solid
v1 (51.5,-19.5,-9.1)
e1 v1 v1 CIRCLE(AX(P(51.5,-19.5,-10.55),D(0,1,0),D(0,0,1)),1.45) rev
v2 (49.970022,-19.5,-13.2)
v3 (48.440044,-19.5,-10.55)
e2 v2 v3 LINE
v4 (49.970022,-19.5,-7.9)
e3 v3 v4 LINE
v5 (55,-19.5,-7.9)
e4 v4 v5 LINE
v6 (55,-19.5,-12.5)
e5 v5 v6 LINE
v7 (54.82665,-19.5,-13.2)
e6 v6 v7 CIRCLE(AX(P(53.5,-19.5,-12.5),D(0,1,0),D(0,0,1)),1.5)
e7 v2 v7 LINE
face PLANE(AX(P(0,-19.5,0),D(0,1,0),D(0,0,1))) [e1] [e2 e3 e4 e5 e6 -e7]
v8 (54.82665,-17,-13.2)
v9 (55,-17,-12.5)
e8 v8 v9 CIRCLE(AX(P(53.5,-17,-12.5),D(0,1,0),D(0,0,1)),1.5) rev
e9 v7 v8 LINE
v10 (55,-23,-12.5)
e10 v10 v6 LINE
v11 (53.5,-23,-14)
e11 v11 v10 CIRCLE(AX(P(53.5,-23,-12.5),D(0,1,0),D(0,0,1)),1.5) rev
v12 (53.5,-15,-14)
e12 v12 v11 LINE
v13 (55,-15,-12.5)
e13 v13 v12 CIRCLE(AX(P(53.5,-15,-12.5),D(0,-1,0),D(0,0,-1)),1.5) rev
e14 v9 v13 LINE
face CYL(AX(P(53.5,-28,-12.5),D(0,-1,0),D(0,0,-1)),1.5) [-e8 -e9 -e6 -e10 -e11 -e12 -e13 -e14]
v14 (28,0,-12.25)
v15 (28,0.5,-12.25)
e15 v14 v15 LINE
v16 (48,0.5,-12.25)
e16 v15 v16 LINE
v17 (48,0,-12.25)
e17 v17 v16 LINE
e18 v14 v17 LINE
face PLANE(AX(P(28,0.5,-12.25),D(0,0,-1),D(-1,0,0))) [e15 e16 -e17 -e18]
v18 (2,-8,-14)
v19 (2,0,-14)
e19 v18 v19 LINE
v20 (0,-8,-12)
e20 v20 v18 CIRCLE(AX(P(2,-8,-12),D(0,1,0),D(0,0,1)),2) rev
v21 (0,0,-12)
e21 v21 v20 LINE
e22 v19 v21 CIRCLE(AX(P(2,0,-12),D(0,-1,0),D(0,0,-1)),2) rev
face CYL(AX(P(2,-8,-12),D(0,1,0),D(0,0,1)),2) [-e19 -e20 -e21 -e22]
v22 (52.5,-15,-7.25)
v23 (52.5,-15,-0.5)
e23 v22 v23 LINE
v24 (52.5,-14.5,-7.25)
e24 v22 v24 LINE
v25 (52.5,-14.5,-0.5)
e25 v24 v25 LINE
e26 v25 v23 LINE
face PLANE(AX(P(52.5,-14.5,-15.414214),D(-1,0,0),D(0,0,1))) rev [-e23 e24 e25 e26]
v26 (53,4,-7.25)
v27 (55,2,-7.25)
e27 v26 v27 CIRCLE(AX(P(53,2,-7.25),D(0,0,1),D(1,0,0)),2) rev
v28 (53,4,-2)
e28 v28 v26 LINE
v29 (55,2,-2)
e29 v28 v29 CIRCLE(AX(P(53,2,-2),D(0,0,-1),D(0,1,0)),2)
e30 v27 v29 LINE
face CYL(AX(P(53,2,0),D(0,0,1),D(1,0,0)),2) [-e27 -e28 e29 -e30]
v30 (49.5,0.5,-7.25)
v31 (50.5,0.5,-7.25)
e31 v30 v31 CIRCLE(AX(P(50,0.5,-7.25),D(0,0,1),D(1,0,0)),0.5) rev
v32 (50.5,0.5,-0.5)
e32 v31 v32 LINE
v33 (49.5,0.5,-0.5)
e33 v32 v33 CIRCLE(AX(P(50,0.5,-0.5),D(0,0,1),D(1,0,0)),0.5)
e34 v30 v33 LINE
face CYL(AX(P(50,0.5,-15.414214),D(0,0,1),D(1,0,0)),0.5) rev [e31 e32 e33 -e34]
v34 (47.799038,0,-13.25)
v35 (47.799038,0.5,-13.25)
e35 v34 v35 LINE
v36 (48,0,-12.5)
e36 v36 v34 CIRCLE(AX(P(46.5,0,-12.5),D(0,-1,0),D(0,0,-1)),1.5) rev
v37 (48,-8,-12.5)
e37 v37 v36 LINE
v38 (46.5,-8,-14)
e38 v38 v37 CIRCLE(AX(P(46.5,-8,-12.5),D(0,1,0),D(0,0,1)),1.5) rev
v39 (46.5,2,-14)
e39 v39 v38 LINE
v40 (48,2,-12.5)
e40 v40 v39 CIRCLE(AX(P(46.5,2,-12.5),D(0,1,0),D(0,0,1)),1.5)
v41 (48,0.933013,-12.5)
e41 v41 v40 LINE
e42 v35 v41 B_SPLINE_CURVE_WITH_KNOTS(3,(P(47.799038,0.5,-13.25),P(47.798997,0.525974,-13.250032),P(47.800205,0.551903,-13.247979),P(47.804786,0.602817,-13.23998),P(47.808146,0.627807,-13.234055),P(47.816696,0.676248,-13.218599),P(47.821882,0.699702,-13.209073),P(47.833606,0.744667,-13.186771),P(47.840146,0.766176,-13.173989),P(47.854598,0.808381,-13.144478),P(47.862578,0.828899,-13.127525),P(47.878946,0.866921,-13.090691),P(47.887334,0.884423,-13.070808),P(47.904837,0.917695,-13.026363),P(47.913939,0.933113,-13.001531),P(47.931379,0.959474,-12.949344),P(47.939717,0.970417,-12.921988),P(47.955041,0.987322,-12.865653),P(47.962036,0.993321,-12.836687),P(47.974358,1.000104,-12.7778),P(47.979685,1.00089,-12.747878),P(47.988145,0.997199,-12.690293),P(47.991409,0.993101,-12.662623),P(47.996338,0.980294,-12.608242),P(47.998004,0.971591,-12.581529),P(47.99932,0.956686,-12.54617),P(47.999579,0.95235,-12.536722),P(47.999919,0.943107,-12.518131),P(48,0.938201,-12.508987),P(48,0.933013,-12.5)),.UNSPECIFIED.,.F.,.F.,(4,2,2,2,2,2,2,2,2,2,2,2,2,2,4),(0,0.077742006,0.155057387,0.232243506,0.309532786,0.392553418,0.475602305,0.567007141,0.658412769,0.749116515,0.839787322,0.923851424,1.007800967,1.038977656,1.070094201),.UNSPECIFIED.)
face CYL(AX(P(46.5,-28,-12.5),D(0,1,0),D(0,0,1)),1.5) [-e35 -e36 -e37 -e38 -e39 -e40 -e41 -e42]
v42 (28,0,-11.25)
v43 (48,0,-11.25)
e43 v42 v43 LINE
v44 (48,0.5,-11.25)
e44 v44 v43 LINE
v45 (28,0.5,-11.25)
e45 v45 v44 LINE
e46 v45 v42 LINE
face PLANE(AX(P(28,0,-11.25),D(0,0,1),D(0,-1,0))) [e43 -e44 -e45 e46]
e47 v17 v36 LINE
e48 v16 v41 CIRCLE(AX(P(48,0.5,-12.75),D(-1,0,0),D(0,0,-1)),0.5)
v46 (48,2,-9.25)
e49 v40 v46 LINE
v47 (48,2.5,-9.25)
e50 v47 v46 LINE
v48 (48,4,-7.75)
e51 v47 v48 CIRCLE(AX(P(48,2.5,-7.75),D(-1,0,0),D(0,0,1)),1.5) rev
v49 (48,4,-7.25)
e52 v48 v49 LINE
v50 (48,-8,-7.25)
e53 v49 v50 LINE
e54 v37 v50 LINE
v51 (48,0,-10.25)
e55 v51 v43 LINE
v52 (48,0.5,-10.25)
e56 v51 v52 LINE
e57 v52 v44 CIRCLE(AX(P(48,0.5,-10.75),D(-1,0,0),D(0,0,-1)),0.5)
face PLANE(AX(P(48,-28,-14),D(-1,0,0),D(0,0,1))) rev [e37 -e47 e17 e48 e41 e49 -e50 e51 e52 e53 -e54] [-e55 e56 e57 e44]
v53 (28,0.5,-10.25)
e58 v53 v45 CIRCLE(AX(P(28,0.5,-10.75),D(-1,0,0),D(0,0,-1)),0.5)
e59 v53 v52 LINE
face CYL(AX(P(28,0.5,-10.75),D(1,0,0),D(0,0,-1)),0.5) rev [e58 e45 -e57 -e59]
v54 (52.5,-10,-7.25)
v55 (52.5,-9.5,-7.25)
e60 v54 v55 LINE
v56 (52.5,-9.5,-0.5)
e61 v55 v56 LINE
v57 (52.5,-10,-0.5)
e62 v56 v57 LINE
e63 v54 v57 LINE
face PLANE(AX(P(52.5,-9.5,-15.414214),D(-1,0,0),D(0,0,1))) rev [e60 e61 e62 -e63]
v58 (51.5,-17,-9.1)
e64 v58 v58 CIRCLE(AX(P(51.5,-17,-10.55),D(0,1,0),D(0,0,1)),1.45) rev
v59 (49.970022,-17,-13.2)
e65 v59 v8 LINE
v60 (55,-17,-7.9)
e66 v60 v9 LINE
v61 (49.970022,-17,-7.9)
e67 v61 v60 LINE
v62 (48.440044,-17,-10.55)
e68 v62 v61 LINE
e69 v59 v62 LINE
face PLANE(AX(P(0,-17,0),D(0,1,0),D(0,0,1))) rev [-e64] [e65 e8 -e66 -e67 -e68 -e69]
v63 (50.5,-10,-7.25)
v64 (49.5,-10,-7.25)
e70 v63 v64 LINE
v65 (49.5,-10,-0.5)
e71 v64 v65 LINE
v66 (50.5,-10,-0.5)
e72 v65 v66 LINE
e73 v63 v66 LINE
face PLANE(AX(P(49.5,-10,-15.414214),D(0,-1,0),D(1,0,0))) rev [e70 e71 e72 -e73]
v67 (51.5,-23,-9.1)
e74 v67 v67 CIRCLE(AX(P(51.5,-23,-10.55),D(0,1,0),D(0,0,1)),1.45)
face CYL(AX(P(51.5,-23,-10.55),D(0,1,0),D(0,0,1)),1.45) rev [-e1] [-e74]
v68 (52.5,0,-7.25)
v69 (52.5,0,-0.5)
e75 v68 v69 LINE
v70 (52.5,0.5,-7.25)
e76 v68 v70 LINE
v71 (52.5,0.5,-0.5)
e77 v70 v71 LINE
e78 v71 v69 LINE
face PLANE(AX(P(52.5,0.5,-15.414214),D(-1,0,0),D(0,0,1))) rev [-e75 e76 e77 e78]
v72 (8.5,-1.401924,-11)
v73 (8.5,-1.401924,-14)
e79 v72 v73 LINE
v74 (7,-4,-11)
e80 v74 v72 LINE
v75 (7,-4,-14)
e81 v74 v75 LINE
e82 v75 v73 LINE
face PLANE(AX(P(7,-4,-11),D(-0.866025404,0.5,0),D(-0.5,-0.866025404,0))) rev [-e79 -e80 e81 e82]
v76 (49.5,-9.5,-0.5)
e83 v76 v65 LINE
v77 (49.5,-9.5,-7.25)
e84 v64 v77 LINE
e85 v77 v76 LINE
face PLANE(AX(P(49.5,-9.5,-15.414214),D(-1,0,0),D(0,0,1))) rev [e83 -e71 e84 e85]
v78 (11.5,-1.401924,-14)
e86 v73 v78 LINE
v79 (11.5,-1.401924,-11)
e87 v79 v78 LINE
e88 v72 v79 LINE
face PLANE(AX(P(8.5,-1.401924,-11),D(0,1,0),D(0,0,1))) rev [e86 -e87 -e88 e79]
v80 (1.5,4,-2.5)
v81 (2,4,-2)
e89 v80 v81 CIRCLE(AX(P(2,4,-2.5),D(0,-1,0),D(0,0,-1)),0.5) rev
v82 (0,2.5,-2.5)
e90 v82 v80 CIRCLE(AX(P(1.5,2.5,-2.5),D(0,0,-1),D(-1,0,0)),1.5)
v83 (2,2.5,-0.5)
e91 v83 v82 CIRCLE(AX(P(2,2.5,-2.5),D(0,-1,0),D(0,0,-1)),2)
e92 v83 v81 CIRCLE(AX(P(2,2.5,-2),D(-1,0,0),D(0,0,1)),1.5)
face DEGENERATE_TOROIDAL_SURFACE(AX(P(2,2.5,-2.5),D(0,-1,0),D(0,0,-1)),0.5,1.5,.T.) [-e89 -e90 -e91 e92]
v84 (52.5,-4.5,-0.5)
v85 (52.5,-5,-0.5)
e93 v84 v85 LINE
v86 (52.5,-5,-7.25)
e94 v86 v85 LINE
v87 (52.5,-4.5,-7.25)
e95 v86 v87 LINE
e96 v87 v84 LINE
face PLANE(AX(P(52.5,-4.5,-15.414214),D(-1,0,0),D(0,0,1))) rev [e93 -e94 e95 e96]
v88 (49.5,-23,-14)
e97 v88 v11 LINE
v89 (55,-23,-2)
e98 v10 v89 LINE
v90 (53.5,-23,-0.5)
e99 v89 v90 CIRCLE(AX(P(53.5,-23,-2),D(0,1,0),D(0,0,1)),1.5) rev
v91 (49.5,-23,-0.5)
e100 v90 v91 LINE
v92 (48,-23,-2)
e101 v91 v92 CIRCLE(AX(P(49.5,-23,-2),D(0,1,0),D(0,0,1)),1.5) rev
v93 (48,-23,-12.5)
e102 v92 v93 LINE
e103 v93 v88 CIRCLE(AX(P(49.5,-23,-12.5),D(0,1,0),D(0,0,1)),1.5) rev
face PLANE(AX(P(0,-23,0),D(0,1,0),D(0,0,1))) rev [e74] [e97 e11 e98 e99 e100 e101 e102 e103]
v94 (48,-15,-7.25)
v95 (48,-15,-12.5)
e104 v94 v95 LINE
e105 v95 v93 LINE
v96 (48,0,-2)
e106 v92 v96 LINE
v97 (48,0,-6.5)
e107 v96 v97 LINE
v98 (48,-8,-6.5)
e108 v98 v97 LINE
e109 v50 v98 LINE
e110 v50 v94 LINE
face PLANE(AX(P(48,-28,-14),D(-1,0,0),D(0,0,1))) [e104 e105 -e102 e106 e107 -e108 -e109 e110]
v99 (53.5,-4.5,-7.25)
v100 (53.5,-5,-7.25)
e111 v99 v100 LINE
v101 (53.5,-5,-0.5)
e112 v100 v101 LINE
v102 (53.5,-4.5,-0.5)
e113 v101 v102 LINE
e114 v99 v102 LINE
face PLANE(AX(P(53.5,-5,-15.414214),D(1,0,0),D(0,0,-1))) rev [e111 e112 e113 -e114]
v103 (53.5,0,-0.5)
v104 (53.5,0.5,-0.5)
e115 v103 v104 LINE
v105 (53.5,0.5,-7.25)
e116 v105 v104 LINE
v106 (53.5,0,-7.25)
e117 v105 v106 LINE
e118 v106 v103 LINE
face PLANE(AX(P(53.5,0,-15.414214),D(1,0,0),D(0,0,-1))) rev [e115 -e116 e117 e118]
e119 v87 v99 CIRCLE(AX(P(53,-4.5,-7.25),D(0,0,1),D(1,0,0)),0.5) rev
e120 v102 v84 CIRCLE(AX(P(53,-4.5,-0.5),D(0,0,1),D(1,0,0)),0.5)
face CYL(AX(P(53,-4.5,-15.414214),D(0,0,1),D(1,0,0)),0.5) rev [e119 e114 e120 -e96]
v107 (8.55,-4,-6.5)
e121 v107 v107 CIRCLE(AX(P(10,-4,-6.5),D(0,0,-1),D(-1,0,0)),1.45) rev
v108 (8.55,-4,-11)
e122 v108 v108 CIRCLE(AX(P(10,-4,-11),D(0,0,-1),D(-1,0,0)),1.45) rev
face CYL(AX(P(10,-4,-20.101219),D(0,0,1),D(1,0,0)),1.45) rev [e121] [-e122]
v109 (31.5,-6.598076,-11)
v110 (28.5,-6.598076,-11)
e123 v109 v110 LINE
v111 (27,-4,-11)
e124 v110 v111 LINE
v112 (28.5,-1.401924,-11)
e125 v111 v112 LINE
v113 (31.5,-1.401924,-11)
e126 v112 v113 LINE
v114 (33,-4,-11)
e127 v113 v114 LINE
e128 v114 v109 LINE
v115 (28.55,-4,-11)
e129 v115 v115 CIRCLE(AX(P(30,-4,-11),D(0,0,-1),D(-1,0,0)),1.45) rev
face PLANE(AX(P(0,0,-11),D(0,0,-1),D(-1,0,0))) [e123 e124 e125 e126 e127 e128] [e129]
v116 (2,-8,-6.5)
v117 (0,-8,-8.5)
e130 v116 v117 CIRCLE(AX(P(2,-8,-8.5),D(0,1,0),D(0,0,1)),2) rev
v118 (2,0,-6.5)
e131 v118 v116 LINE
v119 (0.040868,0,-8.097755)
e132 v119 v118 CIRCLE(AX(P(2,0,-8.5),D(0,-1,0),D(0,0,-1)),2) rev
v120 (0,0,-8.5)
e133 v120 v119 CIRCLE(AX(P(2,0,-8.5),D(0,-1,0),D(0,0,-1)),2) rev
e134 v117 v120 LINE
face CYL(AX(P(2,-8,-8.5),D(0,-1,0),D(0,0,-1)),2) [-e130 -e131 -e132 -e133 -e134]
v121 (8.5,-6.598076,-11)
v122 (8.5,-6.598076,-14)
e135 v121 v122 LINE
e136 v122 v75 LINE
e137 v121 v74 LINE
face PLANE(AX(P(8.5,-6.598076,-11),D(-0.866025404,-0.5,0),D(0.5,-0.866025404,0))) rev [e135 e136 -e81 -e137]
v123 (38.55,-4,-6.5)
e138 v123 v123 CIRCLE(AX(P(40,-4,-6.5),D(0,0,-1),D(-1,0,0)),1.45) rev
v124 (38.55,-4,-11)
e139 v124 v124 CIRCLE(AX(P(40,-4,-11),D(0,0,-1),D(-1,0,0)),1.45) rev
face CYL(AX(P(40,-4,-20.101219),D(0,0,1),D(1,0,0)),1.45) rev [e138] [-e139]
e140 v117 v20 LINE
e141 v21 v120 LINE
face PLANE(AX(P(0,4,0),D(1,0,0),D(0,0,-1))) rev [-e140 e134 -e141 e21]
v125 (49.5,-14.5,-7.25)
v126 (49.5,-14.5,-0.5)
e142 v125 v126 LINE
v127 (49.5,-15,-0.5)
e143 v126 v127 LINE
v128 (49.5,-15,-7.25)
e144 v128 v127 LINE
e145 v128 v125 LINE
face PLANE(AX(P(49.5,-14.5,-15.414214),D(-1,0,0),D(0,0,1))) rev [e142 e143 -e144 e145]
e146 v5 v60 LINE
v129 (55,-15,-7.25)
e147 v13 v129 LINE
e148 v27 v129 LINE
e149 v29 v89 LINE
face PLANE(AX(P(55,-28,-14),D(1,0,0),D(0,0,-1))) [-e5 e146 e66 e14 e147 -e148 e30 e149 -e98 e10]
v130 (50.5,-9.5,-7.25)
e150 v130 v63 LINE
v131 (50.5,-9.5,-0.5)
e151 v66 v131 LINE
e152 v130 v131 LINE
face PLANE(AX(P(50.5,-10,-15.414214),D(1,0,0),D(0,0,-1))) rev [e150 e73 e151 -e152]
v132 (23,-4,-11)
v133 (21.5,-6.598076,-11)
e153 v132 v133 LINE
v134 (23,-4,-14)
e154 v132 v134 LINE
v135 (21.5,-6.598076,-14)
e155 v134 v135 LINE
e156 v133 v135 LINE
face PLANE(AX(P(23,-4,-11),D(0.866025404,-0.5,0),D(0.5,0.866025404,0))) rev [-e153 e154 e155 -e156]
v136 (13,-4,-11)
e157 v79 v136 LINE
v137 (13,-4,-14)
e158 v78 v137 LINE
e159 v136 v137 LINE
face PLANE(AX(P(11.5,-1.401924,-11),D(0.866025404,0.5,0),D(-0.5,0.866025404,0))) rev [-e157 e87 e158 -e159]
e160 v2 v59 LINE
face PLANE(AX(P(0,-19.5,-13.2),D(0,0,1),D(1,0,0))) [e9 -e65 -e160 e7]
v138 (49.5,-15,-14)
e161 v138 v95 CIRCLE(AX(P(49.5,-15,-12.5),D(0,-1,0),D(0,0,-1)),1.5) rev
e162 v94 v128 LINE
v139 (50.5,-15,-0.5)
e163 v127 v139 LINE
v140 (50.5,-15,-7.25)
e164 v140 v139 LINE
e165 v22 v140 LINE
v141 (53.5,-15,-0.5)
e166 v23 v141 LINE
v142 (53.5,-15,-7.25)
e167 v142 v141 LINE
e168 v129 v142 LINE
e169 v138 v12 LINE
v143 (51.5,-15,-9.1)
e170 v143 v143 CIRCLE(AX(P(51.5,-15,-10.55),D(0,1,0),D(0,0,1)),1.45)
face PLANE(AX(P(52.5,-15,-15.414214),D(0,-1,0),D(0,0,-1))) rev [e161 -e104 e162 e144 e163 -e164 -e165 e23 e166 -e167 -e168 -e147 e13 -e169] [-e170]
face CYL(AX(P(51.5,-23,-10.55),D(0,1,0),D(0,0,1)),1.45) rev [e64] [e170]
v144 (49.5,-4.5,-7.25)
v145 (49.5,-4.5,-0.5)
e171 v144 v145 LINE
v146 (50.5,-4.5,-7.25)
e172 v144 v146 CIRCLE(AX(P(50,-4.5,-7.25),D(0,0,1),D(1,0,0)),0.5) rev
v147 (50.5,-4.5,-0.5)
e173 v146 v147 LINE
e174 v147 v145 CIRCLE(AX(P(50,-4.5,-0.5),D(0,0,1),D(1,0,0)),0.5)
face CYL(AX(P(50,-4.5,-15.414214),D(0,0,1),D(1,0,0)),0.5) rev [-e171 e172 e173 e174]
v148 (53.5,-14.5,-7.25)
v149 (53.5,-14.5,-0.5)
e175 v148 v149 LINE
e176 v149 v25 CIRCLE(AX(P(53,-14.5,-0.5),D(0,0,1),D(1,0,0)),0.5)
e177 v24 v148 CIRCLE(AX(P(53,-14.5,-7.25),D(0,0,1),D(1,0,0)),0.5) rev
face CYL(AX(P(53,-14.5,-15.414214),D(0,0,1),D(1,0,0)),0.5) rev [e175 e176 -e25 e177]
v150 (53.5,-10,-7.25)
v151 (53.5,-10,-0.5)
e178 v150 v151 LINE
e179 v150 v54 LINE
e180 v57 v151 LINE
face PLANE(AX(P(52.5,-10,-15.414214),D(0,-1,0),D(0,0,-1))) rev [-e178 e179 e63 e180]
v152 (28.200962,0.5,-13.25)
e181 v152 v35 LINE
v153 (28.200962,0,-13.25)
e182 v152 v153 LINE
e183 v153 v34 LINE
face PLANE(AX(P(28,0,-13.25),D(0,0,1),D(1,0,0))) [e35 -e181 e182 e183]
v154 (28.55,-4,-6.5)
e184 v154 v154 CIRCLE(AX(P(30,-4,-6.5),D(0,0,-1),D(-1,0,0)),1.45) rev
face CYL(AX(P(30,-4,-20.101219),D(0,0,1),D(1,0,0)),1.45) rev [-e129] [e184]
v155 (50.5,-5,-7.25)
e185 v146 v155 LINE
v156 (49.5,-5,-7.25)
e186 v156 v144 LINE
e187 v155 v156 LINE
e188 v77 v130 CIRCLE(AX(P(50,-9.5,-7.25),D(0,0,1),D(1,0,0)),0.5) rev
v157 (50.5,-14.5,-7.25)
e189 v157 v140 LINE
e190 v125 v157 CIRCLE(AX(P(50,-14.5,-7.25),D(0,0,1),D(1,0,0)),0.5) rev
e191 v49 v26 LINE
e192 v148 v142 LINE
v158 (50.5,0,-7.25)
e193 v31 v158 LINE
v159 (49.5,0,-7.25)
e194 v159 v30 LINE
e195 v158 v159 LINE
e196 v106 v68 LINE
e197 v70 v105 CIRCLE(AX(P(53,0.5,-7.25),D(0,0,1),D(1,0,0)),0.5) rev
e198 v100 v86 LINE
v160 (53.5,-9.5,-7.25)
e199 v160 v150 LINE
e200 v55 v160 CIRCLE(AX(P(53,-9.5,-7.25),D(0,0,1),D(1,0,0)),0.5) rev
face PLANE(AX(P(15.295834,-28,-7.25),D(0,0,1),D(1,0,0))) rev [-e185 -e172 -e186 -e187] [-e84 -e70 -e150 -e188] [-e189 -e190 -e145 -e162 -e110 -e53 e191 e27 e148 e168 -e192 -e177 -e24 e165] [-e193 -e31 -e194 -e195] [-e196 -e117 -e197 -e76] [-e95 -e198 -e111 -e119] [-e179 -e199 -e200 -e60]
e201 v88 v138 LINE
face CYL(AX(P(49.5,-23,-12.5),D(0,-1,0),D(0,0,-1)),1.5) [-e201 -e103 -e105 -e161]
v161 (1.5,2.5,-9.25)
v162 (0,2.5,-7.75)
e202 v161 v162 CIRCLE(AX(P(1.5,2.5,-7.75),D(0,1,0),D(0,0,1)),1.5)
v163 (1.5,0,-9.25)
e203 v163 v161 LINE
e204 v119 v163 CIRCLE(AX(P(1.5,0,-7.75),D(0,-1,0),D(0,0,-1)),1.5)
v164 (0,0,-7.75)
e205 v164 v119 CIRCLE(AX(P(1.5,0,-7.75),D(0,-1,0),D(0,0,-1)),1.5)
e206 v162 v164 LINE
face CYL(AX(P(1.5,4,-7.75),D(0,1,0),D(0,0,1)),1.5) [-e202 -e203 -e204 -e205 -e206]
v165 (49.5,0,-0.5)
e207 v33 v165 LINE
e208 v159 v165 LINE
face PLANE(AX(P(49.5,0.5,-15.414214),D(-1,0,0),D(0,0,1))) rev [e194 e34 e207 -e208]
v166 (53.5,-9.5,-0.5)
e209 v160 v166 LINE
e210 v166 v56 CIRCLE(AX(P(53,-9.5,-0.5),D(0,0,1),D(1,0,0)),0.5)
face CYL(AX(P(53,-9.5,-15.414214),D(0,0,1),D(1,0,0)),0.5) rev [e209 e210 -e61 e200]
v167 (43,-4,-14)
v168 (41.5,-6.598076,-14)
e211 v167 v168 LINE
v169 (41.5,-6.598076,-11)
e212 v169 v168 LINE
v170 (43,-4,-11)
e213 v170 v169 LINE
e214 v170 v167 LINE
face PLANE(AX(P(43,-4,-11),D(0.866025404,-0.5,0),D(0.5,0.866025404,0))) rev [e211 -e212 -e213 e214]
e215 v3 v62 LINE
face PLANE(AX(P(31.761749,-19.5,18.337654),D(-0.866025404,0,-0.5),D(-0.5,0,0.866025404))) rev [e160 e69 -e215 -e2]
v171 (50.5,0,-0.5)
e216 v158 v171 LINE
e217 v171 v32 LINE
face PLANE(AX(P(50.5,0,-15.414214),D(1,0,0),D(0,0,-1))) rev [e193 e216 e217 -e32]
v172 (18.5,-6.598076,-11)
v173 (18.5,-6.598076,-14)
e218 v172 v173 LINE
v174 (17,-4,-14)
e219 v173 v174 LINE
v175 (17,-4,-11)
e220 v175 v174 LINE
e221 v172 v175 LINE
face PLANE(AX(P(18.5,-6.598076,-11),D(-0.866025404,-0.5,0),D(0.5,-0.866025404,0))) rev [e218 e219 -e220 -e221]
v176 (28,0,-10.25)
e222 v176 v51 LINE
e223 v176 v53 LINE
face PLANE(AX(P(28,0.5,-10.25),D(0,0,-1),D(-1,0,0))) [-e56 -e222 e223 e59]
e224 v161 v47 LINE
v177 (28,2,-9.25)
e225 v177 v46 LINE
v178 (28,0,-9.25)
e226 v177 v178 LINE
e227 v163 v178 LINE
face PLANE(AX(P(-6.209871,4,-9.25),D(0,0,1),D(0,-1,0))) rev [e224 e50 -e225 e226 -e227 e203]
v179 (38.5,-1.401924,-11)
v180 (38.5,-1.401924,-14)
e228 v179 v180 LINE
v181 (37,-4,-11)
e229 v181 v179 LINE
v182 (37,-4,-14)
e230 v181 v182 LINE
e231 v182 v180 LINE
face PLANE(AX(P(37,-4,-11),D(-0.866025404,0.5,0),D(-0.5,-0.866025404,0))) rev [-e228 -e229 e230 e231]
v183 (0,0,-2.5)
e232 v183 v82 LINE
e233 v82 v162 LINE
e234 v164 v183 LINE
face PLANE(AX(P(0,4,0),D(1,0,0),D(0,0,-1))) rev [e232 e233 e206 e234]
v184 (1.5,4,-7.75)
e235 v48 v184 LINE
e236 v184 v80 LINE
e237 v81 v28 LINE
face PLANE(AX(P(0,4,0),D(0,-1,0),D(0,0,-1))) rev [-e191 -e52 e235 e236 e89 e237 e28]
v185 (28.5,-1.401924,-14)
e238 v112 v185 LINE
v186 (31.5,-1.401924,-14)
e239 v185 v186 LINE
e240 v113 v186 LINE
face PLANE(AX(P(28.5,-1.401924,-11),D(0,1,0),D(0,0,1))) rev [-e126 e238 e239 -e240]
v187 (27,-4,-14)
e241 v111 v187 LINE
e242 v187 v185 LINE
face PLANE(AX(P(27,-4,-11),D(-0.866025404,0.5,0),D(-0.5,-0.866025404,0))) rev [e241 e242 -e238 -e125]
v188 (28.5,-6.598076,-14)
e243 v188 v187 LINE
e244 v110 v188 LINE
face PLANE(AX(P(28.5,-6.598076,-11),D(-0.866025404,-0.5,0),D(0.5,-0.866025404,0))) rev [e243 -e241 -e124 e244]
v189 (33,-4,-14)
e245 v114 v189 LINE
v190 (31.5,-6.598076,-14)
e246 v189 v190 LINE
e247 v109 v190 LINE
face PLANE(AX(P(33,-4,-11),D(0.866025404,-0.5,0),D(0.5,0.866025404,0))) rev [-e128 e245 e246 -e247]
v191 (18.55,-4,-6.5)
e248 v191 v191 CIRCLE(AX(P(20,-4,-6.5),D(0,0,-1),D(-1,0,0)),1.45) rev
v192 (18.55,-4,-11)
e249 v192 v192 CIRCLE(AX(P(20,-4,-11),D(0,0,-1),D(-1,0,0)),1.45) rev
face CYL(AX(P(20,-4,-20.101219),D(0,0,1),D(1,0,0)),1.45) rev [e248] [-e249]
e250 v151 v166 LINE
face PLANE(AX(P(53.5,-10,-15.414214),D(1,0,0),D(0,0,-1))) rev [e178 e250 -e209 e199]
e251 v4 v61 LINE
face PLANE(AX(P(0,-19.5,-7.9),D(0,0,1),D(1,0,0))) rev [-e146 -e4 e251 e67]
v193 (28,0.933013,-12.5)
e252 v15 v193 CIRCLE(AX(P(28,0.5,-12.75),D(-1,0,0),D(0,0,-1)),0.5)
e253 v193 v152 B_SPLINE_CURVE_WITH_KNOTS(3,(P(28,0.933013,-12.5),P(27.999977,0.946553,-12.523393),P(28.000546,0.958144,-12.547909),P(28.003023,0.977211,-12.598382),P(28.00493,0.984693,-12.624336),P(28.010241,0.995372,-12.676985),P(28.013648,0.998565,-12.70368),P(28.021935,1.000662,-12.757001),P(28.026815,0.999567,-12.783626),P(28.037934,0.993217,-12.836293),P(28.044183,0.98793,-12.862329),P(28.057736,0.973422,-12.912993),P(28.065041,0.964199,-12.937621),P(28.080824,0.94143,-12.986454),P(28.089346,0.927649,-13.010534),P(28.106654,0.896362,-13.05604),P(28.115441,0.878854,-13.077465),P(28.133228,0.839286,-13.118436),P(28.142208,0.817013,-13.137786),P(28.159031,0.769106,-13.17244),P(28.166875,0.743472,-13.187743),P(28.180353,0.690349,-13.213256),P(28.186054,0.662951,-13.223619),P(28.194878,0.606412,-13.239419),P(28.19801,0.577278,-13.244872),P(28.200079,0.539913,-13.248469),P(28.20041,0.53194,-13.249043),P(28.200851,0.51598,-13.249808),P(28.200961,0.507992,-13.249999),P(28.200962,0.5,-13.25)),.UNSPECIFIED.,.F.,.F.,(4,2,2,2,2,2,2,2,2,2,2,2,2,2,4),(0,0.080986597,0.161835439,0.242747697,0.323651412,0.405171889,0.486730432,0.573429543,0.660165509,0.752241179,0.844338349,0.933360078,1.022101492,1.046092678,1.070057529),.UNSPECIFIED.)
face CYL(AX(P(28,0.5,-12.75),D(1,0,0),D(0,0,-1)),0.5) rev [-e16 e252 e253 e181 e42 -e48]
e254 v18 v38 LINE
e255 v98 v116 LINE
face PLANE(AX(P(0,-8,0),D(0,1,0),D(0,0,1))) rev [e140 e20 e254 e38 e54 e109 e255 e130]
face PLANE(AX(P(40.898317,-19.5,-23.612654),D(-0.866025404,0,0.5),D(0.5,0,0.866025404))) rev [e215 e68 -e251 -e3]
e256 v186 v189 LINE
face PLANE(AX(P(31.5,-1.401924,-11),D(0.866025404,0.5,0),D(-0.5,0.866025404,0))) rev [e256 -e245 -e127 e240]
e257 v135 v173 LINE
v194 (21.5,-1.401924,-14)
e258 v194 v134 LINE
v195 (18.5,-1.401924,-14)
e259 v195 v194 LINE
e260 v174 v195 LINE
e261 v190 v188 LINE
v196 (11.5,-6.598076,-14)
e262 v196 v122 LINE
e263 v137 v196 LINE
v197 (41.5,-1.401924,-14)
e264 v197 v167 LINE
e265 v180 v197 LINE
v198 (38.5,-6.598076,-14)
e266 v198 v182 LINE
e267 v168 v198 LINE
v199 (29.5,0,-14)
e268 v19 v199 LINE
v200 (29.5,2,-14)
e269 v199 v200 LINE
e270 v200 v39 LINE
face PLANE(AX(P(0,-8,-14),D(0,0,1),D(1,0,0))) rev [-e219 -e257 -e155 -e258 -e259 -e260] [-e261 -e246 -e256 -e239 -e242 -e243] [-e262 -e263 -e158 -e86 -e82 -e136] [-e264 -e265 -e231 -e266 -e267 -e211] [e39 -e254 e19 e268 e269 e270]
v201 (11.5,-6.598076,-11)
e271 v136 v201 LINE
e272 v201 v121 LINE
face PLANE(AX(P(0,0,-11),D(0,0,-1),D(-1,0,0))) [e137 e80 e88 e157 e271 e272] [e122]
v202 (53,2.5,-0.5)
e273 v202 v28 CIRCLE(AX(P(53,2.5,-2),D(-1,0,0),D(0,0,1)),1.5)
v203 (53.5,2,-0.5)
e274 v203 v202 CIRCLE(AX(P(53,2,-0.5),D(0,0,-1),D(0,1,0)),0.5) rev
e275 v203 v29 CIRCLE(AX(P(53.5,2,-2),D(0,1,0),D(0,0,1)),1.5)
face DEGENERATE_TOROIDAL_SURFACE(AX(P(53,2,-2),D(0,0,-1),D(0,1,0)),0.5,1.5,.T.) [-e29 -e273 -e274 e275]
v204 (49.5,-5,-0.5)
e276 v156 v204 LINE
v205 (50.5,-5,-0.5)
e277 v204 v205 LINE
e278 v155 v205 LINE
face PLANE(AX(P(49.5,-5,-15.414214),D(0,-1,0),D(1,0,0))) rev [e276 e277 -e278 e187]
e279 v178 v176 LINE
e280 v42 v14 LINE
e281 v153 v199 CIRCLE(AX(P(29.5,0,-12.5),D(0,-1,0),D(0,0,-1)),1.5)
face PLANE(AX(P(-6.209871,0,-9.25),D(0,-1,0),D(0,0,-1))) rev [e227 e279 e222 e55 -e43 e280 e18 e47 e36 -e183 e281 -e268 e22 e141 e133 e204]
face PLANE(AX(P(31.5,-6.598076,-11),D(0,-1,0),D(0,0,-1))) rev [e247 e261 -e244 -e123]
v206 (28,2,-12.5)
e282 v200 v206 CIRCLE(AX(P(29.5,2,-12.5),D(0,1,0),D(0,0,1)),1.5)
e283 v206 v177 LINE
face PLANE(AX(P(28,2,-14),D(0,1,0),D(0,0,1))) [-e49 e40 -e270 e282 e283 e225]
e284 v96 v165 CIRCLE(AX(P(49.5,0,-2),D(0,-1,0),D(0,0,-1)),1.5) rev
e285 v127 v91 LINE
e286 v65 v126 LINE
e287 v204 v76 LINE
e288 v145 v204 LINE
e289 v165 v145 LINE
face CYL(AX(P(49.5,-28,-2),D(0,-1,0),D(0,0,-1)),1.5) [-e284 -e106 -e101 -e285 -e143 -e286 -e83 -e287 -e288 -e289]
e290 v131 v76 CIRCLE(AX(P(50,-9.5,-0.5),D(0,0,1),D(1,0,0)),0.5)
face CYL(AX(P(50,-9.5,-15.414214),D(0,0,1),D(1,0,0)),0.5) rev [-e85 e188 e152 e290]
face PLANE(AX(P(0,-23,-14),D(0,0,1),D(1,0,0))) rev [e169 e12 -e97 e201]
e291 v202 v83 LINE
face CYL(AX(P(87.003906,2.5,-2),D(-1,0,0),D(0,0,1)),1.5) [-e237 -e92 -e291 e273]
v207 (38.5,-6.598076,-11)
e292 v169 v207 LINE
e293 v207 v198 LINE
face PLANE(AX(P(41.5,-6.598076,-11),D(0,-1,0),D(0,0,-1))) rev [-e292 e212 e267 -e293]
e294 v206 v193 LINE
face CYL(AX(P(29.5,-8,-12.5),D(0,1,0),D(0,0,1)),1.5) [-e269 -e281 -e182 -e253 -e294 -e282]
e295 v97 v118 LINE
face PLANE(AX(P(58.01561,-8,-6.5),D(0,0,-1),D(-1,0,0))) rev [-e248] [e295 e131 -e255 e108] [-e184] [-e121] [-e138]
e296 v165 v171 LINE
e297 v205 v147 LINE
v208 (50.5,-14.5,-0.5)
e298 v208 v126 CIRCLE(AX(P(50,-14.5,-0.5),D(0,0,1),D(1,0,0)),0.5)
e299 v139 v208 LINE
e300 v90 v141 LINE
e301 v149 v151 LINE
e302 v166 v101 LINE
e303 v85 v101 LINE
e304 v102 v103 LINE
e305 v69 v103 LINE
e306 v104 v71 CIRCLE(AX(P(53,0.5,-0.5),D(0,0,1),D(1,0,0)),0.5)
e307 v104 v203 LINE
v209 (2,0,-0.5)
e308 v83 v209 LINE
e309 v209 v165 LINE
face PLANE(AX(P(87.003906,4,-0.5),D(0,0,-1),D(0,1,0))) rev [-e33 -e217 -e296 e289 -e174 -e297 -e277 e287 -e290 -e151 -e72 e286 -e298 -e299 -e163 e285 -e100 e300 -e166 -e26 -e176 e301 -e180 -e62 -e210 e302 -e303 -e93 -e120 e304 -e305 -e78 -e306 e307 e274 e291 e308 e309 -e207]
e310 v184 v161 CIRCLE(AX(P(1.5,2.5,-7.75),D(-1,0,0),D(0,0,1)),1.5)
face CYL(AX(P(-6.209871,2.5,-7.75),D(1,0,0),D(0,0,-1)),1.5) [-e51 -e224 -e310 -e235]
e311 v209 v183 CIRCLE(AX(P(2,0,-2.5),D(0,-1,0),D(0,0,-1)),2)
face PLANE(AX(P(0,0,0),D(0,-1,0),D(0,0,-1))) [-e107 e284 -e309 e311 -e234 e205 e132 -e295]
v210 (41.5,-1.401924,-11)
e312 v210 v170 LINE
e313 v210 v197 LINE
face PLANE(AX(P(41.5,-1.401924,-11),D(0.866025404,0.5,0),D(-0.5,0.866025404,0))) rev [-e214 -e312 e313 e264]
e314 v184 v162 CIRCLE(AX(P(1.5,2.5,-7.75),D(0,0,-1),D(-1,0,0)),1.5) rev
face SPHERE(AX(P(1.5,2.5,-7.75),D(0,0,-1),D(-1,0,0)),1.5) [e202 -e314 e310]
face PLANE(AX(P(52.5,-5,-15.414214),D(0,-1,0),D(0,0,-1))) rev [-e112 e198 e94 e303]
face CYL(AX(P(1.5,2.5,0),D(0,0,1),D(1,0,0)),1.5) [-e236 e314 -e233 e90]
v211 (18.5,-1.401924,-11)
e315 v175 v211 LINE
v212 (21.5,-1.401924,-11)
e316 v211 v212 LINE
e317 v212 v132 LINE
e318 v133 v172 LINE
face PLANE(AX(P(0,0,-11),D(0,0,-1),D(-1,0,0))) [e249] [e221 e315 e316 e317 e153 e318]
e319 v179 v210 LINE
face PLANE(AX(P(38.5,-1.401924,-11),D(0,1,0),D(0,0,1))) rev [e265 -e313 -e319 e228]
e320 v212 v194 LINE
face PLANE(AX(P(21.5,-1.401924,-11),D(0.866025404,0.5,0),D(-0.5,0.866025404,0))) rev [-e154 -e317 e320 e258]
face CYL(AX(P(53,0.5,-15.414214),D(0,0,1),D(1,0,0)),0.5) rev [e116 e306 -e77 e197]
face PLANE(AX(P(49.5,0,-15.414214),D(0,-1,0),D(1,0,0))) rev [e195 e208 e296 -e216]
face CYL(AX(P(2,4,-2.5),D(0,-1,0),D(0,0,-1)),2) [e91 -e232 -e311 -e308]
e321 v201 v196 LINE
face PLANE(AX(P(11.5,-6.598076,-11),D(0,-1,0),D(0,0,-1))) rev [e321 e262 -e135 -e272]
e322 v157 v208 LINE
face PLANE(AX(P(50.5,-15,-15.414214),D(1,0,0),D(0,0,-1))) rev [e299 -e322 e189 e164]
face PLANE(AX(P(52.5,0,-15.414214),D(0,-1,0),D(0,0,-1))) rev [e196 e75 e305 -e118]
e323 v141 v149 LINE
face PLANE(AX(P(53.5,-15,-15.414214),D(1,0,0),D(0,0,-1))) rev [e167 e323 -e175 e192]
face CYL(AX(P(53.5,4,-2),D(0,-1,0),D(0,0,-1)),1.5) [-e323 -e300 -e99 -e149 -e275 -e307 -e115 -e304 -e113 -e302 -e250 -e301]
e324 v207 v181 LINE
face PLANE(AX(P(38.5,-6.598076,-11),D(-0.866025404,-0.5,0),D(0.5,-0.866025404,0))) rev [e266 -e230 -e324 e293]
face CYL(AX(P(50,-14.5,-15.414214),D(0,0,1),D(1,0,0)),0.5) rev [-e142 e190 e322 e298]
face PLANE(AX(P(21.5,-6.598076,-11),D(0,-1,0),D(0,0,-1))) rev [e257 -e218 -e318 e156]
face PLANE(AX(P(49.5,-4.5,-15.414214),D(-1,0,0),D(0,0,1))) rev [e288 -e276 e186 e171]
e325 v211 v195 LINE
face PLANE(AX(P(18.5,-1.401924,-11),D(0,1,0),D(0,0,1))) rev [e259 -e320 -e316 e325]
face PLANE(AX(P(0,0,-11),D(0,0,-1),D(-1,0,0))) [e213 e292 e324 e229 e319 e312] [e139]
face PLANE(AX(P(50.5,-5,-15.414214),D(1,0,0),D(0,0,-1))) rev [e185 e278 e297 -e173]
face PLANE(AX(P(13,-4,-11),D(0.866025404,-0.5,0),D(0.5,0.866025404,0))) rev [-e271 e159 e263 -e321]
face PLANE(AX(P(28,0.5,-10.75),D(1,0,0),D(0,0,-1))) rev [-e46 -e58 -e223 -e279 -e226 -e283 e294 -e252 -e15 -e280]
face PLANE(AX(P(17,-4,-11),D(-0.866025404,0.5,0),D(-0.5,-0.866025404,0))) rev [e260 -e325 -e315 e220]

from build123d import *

# Parameters (mm, degrees)
SKETCH1_W            = 55
SKETCH1_H            = 16
BOSS_EXTRUDE1_DEPTH  = 4
SKETCH2_W            = 50
SKETCH2_H            = 8
BOSS_EXTRUDE2_DEPTH  = 8
SKETCH3_W            = 5
SKETCH3_H            = 16
BOSS_EXTRUDE3_DEPTH  = 28
SKETCH4_R            = 1.45
CUT_EXTRUDE2_DEPTH   = 10
CUT_EXTRUDE4_START   = -3
CUT_EXTRUDE4_DEPTH   = 3
CUT_EXTRUDE5_DEPTH   = 5
SKETCH8_W            = 50
SKETCH8_H            = 2
CUT_EXTRUDE6_DEPTH   = 4
CUT_EXTRUDE7_START   = -50
SKETCH9_W            = 0.5
SKETCH9_H            = 8
CUT_EXTRUDE7_DEPTH   = 50
CUT_EXTRUDE8_START   = -55
SKETCH10_W           = 0.5
SKETCH10_H           = 32
CUT_EXTRUDE8_DEPTH   = 55
CUT_EXTRUDE9_DEPTH   = 3
CUT_EXTRUDE11_DEPTH  = 3
BOSS_EXTRUDE4_START  = 2
SKETCH17_W           = 15
SKETCH17_H           = 32
BOSS_EXTRUDE4_DEPTH  = 2
CUT_EXTRUDE12_START  = -32
SKETCH18_W           = 7
SKETCH18_H           = 1.5
CUT_EXTRUDE12_DEPTH  = 32
FILLET1_R            = 2
SKETCH19_W           = 13.5
SKETCH19_H           = 32
CUT_EXTRUDE13_DEPTH  = 7
SKETCH20_W           = 7
SKETCH20_H           = 13.5
BOSS_EXTRUDE5_DEPTH  = 32
CUT_EXTRUDE14_DEPTH  = 13.5
FILLET2_R            = 2
CUT_EXTRUDE15_REACH  = 65.285
SKETCH22_W           = 6.75
SKETCH22_H           = 32
LPATTERN1_COUNT      = 4
LPATTERN1_PITCH      = 5
SKETCH23_W           = 4.75
SKETCH23_H           = 4
CUT_EXTRUDE16_DEPTH  = 48
BOSS_EXTRUDE9_START  = -15
SKETCH29_W           = 7
SKETCH29_H           = 6.75
SKETCH29_R           = 1.45
BOSS_EXTRUDE9_DEPTH  = 8
CUT_EXTRUDE19_START  = -2
CUT_EXTRUDE19_DEPTH  = 2.5
BOSS_EXTRUDE11_DEPTH = 20
SKETCH35_W           = 7
SKETCH35_H           = 5
CUT_EXTRUDE20_DEPTH  = 6.75
FILLET3_R            = 1.5


# Read off the part's stored shape, not the designer's step: Cut-Extrude4
with BuildPart() as part:
    # Sketch1 → Boss-Extrude1 (new body)
    with BuildSketch(Plane(origin=(0, 0, 0), x_dir=(1, 0, 0), z_dir=(0, 1, 0))):
        with Locations((27.5, 8)):
            Rectangle(SKETCH1_W, SKETCH1_H)
    extrude(amount=BOSS_EXTRUDE1_DEPTH)

    # Sketch2 → Boss-Extrude2 (add)
    with BuildSketch(Plane.XZ):
        with Locations((25, -10)):
            Rectangle(SKETCH2_W, SKETCH2_H)
    extrude(amount=BOSS_EXTRUDE2_DEPTH)

    # Sketch3 → Boss-Extrude3 (add)
    with BuildSketch(Plane.XZ):
        with Locations((52.5, -8)):
            Rectangle(SKETCH3_W, SKETCH3_H)
    extrude(amount=BOSS_EXTRUDE3_DEPTH)

    # Sketch4 → Cut-Extrude2 (cut)
    with BuildSketch(Plane.XY.offset(-6)):
        with Locations((10, -4)):
            Circle(SKETCH4_R)
        with Locations((20, -4)):
            Circle(SKETCH4_R)
        with Locations((30, -4)):
            Circle(SKETCH4_R)
        with Locations((40, -4)):
            Circle(SKETCH4_R)
    extrude(amount=-CUT_EXTRUDE2_DEPTH, mode=Mode.SUBTRACT)

    # Cut-Extrude4 outline → Cut-Extrude4 (cut)
    with BuildSketch(Plane.ZY.offset(-50).offset(CUT_EXTRUDE4_START)):
        Polygon((-6.598076211, -25.5), (-4, -27), (-1.401923789, -25.5), (-1.401923789, 0), (-6, 0), (-6, -8), (-6.598076211, -8), align=None)
        Polygon((-7.401923789, -25.5), (-7.401923789, -8), (-12.598076211, -8), (-12.598076211, -25.5), (-10, -27), align=None)
    extrude(amount=CUT_EXTRUDE4_DEPTH, mode=Mode.SUBTRACT)

    # Sketch7 → Cut-Extrude5 (cut)
    with BuildSketch(Plane.ZY.offset(-50)):
        with BuildLine():
            Line((-11.45, -12), (-11.45, -24))
            ThreePointArc((-11.45, -24), (-10, -25.45), (-8.55, -24))
            Line((-8.55, -24), (-8.55, -12))
            ThreePointArc((-8.55, -12), (-10, -10.55), (-11.45, -12))
        make_face()
        with BuildLine():
            Line((-2.55, -12), (-2.55, -24))
            ThreePointArc((-2.55, -24), (-4, -25.45), (-5.45, -24))
            Line((-5.45, -24), (-5.45, -12))
            ThreePointArc((-5.45, -12), (-4, -10.55), (-2.55, -12))
        make_face()
    extrude(amount=-CUT_EXTRUDE5_DEPTH, mode=Mode.SUBTRACT)

    # Sketch8 → Cut-Extrude6 (cut)
    with BuildSketch(Plane(origin=(0, 4, 0), x_dir=(1, 0, 0), z_dir=(0, 1, 0))):
        with Locations((25, 15)):
            Rectangle(SKETCH8_W, SKETCH8_H)
    extrude(amount=-CUT_EXTRUDE6_DEPTH, mode=Mode.SUBTRACT)

    # Sketch9 → Cut-Extrude7 (cut)
    with BuildSketch(Plane.ZY.offset(CUT_EXTRUDE7_START)):
        with Locations((-6.25, -4)):
            Rectangle(SKETCH9_W, SKETCH9_H)
    extrude(amount=CUT_EXTRUDE7_DEPTH, mode=Mode.SUBTRACT)

    # Sketch10 → Cut-Extrude8 (cut)
    with BuildSketch(Plane.ZY.offset(CUT_EXTRUDE8_START)):
        with Locations((-0.25, -12)):
            Rectangle(SKETCH10_W, SKETCH10_H)
        with Locations((-15.75, -12)):
            Rectangle(SKETCH10_W, SKETCH10_H)
    extrude(amount=CUT_EXTRUDE8_DEPTH, mode=Mode.SUBTRACT)

    # Sketch11 → Cut-Extrude9 (cut)
    with BuildSketch(Plane(origin=(0, 0, -14), x_dir=(-1, 0, 0), z_dir=(0, 0, -1))):
        Polygon((-37, -4), (-38.5, -1.401923789), (-41.5, -1.401923789), (-43, -4), (-41.5, -6.598076211), (-38.5, -6.598076211), align=None)
        Polygon((-27, -4), (-28.5, -1.401923789), (-31.5, -1.401923789), (-33, -4), (-31.5, -6.598076211), (-28.5, -6.598076211), align=None)
        Polygon((-17, -4), (-18.5, -1.401923789), (-21.5, -1.401923789), (-23, -4), (-21.5, -6.598076211), (-18.5, -6.598076211), align=None)
        Polygon((-7, -4), (-8.5, -1.401923789), (-11.5, -1.401923789), (-13, -4), (-11.5, -6.598076211), (-8.5, -6.598076211), align=None)
    extrude(amount=-CUT_EXTRUDE9_DEPTH, mode=Mode.SUBTRACT)

    # Sketch15 → Cut-Extrude11 (cut)
    with BuildSketch(Plane.ZY.offset(-50)):
        Polygon((-4, -27), (-1.401923789, -25.5), (-1.401923789, 0.004821093), (-1.401923789, 4), (-6.598076211, 4), (-6.598076211, -8), (-6.598076211, -25.5), align=None)
        Polygon((-7.401923789, -25.5), (-7.401923789, -8), (-7.401923789, 4), (-12.598076211, 4), (-12.598076211, -8), (-12.598076211, -25.5), (-10, -27), align=None)
    extrude(amount=-CUT_EXTRUDE11_DEPTH, mode=Mode.SUBTRACT)

    # Sketch17 → Boss-Extrude4 (add)
    with BuildSketch(Plane.ZY.offset(-50).offset(BOSS_EXTRUDE4_START)):
        with Locations((-8, -12)):
            Rectangle(SKETCH17_W, SKETCH17_H)
        with BuildLine():
            Line((-11.45, -12), (-11.45, -24))
            ThreePointArc((-11.45, -24), (-10, -25.45), (-8.55, -24))
            Line((-8.55, -24), (-8.55, -12))
            ThreePointArc((-8.55, -12), (-10, -10.55), (-11.45, -12))
        make_face(mode=Mode.SUBTRACT)
        with BuildLine():
            Line((-5.45, -12), (-5.45, -24))
            ThreePointArc((-5.45, -24), (-4, -25.45), (-2.55, -24))
            Line((-2.55, -24), (-2.55, -12))
            ThreePointArc((-2.55, -12), (-4, -10.55), (-5.45, -12))
        make_face(mode=Mode.SUBTRACT)
    extrude(amount=-BOSS_EXTRUDE4_DEPTH)

    # Sketch18 → Cut-Extrude12 (cut)
    with BuildSketch(Plane(origin=(0, 4, 0), x_dir=(1, 0, 0), z_dir=(0, 1, 0)).offset(CUT_EXTRUDE12_START)):
        with Locations((51.5, 14.75)):
            Rectangle(SKETCH18_W, SKETCH18_H)
    extrude(amount=CUT_EXTRUDE12_DEPTH, mode=Mode.SUBTRACT)

    # Fillet1
    fillet1_edges = [part.edges().sort_by_distance(p)[0] for p in [
        (0, -2, -14),
        (0, -4, -6.5),
        (0, 2, -0.5),
        (55, -12, -0.5),
        (48, -14, -0.5),
        (55, -12, -14),
        (48, -18, -14),
    ]]
    fillet(fillet1_edges, radius=FILLET1_R)

    # Sketch19 → Cut-Extrude13 (cut)
    with BuildSketch(Plane(origin=(55, 0, 0), x_dir=(0, 0, -1), z_dir=(1, 0, 0))):
        with Locations((7.25, -12)):
            Rectangle(SKETCH19_W, SKETCH19_H)
    extrude(amount=-CUT_EXTRUDE13_DEPTH, mode=Mode.SUBTRACT)

    # Sketch20 → Boss-Extrude5 (add)
    with BuildSketch(Plane(origin=(0, 4, 0), x_dir=(1, 0, 0), z_dir=(0, 1, 0))):
        with Locations((51.5, 7.25)):
            Rectangle(SKETCH20_W, SKETCH20_H)
    extrude(amount=-BOSS_EXTRUDE5_DEPTH)

    # Sketch21 → Cut-Extrude14 (cut)
    with BuildSketch(Plane.XY.offset(-0.5)):
        with BuildLine():
            Line((52.5, 0.5), (52.5, 0))
            Line((52.5, 0), (53.5, 0))
            Line((53.5, 0), (53.5, 0.5))
            ThreePointArc((53.5, 0.5), (53.353553391, 0.853553391), (53, 1))
            ThreePointArc((53, 1), (52.646446609, 0.853553391), (52.5, 0.5))
        make_face()
        with BuildLine():
            Line((49.5, 0.5), (49.5, 0))
            Line((49.5, 0), (50.5, 0))
            Line((50.5, 0), (50.5, 0.5))
            ThreePointArc((50.5, 0.5), (50, 1), (49.5, 0.5))
        make_face()
    cut_extrude14 = extrude(amount=-CUT_EXTRUDE14_DEPTH, mode=Mode.SUBTRACT)

    # Fillet2
    fillet2_edges = [part.edges().sort_by_distance(p)[0] for p in [
        (48, -28, -7.25),
        (55, -28, -7.25),
        (55, 4, -7.25),
    ]]
    fillet(fillet2_edges, radius=FILLET2_R)

    # Cut-Extrude15: up to this face of the body (flat: up to its plane)
    cut_extrude15_end = Plane(part.part.faces().sort_by_distance((48, -14.855670103, -6.631443299))[0])
    # Sketch22 → Cut-Extrude15 (cut, up to the picked face)
    with BuildSketch(Plane(origin=(55, 0, 0), x_dir=(0, 0, -1), z_dir=(1, 0, 0)), mode=Mode.PRIVATE) as cut_extrude15_sk1:
        with Locations((10.625, -12)):
            Rectangle(SKETCH22_W, SKETCH22_H)
    cut_extrude15_tool1 = split(extrude(cut_extrude15_sk1.sketch, amount=-CUT_EXTRUDE15_REACH, mode=Mode.PRIVATE), bisect_by=cut_extrude15_end, keep=Keep.BOTH, mode=Mode.PRIVATE)
    add(cut_extrude15_tool1.solids().sort_by(Axis((55, -12, -10.625), (-1, 0, 0)))[0], mode=Mode.SUBTRACT)

    # LPattern1: Cut-Extrude14 ×4
    with Locations(*[(0, -i * LPATTERN1_PITCH, 0) for i in range(1, LPATTERN1_COUNT)]):
        add(cut_extrude14, mode=Mode.SUBTRACT)

    # Sketch23 → Cut-Extrude16 (cut)
    with BuildSketch(Plane(origin=(48, 0, 0), x_dir=(0, 0, -1), z_dir=(1, 0, 0))):
        with Locations((11.625, 2)):
            Rectangle(SKETCH23_W, SKETCH23_H)
    extrude(amount=-CUT_EXTRUDE16_DEPTH, mode=Mode.SUBTRACT)

    # Sketch29 → Boss-Extrude9 (add)
    with BuildSketch(Plane(origin=(0, 0, 0), x_dir=(1, 0, 0), z_dir=(0, 1, 0)).offset(BOSS_EXTRUDE9_START)):
        with Locations((51.5, 10.625)):
            Rectangle(SKETCH29_W, SKETCH29_H)
        with Locations(Location((51.5, 10.55, 0), (0, 0, 270))):
            Circle(SKETCH29_R, mode=Mode.SUBTRACT)
    extrude(amount=-BOSS_EXTRUDE9_DEPTH)

    # Sketch30 → Cut-Extrude19 (cut)
    with BuildSketch(Plane(origin=(0, -15, 0), x_dir=(1, 0, 0), z_dir=(0, 1, 0)).offset(CUT_EXTRUDE19_START)):
        Polygon((53.029978213, 13.2), (49.970021787, 13.2), (48.440043573, 10.55), (49.970021787, 7.9), (53.029978213, 7.9), (55, 7.9), (55, 13.2), align=None)
    extrude(amount=-CUT_EXTRUDE19_DEPTH, mode=Mode.SUBTRACT)

    # Sketch34 → Boss-Extrude11 (add)
    with BuildSketch(Plane(origin=(48, 0, 0), x_dir=(0, 0, -1), z_dir=(1, 0, 0))):
        with BuildLine():
            Line((14, 0), (13.25, 0))
            Line((13.25, 0), (13.25, 0.5))
            ThreePointArc((13.25, 0.5), (12.75, 1), (12.25, 0.5))
            Line((12.25, 0.5), (12.25, 0))
            Line((12.25, 0), (11.25, 0))
            Line((11.25, 0), (11.25, 0.5))
            ThreePointArc((11.25, 0.5), (10.75, 1), (10.25, 0.5))
            Line((10.25, 0.5), (10.25, 0))
            Line((10.25, 0), (9.25, 0))
            Line((9.25, 0), (9.25, 2))
            Line((9.25, 2), (14, 2))
            Line((14, 2), (14, 0))
        make_face()
    extrude(amount=-BOSS_EXTRUDE11_DEPTH)

    # Sketch35 → Cut-Extrude20 (cut)
    with BuildSketch(Plane.XY.offset(-0.5)):
        with Locations((51.5, -25.5)):
            Rectangle(SKETCH35_W, SKETCH35_H)
    extrude(amount=-CUT_EXTRUDE20_DEPTH, mode=Mode.SUBTRACT)

    # Fillet3
    # the kernel refuses this fillet: 1.5 mm, written as the material it takes off along each edge
    with BuildSketch(Plane(origin=(1.5, 2.5, -7.75), x_dir=(0, 0, -1), z_dir=(0, 1, 0))) as fillet3_piece_1_section:
        Polygon((0, 0), (FILLET3_R, 0), (FILLET3_R, FILLET3_R), (0, FILLET3_R), align=None)
    fillet3_piece_1 = extrude(amount=FILLET3_R, mode=Mode.PRIVATE)
    fillet3_piece_1 = fillet3_piece_1 - Plane(origin=(1.5, 2.5, -7.75), x_dir=(0.7071067811865475, 0, 0.7071067811865475), z_dir=(0, 1, 0)) * Sphere(FILLET3_R, mode=Mode.PRIVATE)
    add(fillet3_piece_1, mode=Mode.SUBTRACT)
    with BuildSketch(Plane(origin=(0, 4, -7.75), x_dir=(1, 0, 0), z_dir=(0, 0, 1))) as fillet3_piece_2:
        with BuildLine():
            CenterArc((FILLET3_R, -FILLET3_R), FILLET3_R, 90, 90)
            Line((0, -FILLET3_R), (0, 0))
            Line((0, 0), (FILLET3_R, 0))
        make_face()
    extrude(amount=5.25, mode=Mode.SUBTRACT)
    with BuildSketch(Plane(origin=(2, 4, -2.5), x_dir=(-1, 0, 0), z_dir=(0, 0, -1))) as fillet3_piece_3:
        with BuildLine():
            CenterArc((2 - FILLET3_R, -FILLET3_R), FILLET3_R, 0, 90)
            Line((2, -FILLET3_R), (2, 0))
            Line((2, 0), (2 - FILLET3_R, 0))
        make_face()
    revolve(axis=Axis((2, 4, -2.5), (0, 1, 0)), revolution_arc=90, mode=Mode.SUBTRACT)
    with BuildSketch(Plane(origin=(2, 4, -0.5), x_dir=(0, 0, -1), z_dir=(1, 0, 0))) as fillet3_piece_4:
        with BuildLine():
            CenterArc((FILLET3_R, -FILLET3_R), FILLET3_R, 90, 90)
            Line((0, -FILLET3_R), (0, 0))
            Line((0, 0), (FILLET3_R, 0))
        make_face()
    extrude(amount=51, mode=Mode.SUBTRACT)
    with BuildSketch(Plane(origin=(53, 2, -0.5), x_dir=(0, 1, 0), z_dir=(-1, 0, 0))) as fillet3_piece_5:
        with BuildLine():
            CenterArc((2 - FILLET3_R, FILLET3_R), FILLET3_R, 270, 90)
            Line((2 - FILLET3_R, 0), (2, 0))
            Line((2, 0), (2, FILLET3_R))
        make_face()
    revolve(axis=Axis((53, 2, -0.5), (0, 0, -1)), revolution_arc=90, mode=Mode.SUBTRACT)
    with BuildSketch(Plane(origin=(28, 5.75, -14), x_dir=(1, 0, 0), z_dir=(0, -1, 0))) as fillet3_piece_6:
        with BuildLine():
            CenterArc((FILLET3_R, FILLET3_R), FILLET3_R, 180, 90)
            Line((0, FILLET3_R), (0, 0))
            Line((0, 0), (FILLET3_R, 0))
        make_face()
    extrude(amount=5.75, mode=Mode.SUBTRACT)
    with BuildSketch(Plane(origin=(48, -11.75, -14), x_dir=(-1, 0, 0), z_dir=(0, 1, 0))) as fillet3_piece_7:
        with BuildLine():
            CenterArc((FILLET3_R, FILLET3_R), FILLET3_R, 180, 90)
            Line((0, FILLET3_R), (0, 0))
            Line((0, 0), (FILLET3_R, 0))
        make_face()
    extrude(amount=17.5, mode=Mode.SUBTRACT)
    with BuildSketch(Plane(origin=(48, -11.25, -14), x_dir=(0, 0, 1), z_dir=(0, -1, 0))) as fillet3_piece_8:
        with BuildLine():
            CenterArc((FILLET3_R, -FILLET3_R), FILLET3_R, 90, 90)
            Line((0, -FILLET3_R), (0, 0))
            Line((0, 0), (FILLET3_R, 0))
        make_face()
    extrude(amount=15.5, mode=Mode.SUBTRACT)
    with BuildSketch(Plane(origin=(55, -11.25, -14), x_dir=(0, 0, 1), z_dir=(0, -1, 0))) as fillet3_piece_9:
        with BuildLine():
            CenterArc((FILLET3_R, FILLET3_R), FILLET3_R, 180, 90)
            Line((0, FILLET3_R), (0, 0))
            Line((0, 0), (FILLET3_R, 0))
        make_face()
    extrude(amount=15.5, mode=Mode.SUBTRACT)
    with BuildSketch(Plane(origin=(55, 2, -0.5), x_dir=(0, 0, -1), z_dir=(0, -1, 0))) as fillet3_piece_10:
        with BuildLine():
            CenterArc((FILLET3_R, -FILLET3_R), FILLET3_R, 90, 90)
            Line((0, -FILLET3_R), (0, 0))
            Line((0, 0), (FILLET3_R, 0))
        make_face()
    extrude(amount=28.75, mode=Mode.SUBTRACT)
    with BuildSketch(Plane(origin=(51.75, 4, -9.25), x_dir=(0, 0, 1), z_dir=(-1, 0, 0))) as fillet3_piece_11:
        with BuildLine():
            CenterArc((FILLET3_R, -FILLET3_R), FILLET3_R, 90, 90)
            Line((0, -FILLET3_R), (0, 0))
            Line((0, 0), (FILLET3_R, 0))
        make_face()
    extrude(amount=50.25, mode=Mode.SUBTRACT)
    with BuildSketch(Plane(origin=(0, 0, -9.25), x_dir=(1, 0, 0), z_dir=(0, 1, 0))) as fillet3_piece_12:
        with BuildLine():
            CenterArc((FILLET3_R, -FILLET3_R), FILLET3_R, 90, 90)
            Line((0, -FILLET3_R), (0, 0))
            Line((0, 0), (FILLET3_R, 0))
        make_face()
    extrude(amount=2.5, mode=Mode.SUBTRACT)
    with BuildSketch(Plane(origin=(48, 0, -0.5), x_dir=(0, 0, -1), z_dir=(0, -1, 0))) as fillet3_piece_13:
        with BuildLine():
            CenterArc((FILLET3_R, FILLET3_R), FILLET3_R, 180, 90)
            Line((0, FILLET3_R), (0, 0))
            Line((0, 0), (FILLET3_R, 0))
        make_face()
    extrude(amount=26.75, mode=Mode.SUBTRACT)


solid = part.part
